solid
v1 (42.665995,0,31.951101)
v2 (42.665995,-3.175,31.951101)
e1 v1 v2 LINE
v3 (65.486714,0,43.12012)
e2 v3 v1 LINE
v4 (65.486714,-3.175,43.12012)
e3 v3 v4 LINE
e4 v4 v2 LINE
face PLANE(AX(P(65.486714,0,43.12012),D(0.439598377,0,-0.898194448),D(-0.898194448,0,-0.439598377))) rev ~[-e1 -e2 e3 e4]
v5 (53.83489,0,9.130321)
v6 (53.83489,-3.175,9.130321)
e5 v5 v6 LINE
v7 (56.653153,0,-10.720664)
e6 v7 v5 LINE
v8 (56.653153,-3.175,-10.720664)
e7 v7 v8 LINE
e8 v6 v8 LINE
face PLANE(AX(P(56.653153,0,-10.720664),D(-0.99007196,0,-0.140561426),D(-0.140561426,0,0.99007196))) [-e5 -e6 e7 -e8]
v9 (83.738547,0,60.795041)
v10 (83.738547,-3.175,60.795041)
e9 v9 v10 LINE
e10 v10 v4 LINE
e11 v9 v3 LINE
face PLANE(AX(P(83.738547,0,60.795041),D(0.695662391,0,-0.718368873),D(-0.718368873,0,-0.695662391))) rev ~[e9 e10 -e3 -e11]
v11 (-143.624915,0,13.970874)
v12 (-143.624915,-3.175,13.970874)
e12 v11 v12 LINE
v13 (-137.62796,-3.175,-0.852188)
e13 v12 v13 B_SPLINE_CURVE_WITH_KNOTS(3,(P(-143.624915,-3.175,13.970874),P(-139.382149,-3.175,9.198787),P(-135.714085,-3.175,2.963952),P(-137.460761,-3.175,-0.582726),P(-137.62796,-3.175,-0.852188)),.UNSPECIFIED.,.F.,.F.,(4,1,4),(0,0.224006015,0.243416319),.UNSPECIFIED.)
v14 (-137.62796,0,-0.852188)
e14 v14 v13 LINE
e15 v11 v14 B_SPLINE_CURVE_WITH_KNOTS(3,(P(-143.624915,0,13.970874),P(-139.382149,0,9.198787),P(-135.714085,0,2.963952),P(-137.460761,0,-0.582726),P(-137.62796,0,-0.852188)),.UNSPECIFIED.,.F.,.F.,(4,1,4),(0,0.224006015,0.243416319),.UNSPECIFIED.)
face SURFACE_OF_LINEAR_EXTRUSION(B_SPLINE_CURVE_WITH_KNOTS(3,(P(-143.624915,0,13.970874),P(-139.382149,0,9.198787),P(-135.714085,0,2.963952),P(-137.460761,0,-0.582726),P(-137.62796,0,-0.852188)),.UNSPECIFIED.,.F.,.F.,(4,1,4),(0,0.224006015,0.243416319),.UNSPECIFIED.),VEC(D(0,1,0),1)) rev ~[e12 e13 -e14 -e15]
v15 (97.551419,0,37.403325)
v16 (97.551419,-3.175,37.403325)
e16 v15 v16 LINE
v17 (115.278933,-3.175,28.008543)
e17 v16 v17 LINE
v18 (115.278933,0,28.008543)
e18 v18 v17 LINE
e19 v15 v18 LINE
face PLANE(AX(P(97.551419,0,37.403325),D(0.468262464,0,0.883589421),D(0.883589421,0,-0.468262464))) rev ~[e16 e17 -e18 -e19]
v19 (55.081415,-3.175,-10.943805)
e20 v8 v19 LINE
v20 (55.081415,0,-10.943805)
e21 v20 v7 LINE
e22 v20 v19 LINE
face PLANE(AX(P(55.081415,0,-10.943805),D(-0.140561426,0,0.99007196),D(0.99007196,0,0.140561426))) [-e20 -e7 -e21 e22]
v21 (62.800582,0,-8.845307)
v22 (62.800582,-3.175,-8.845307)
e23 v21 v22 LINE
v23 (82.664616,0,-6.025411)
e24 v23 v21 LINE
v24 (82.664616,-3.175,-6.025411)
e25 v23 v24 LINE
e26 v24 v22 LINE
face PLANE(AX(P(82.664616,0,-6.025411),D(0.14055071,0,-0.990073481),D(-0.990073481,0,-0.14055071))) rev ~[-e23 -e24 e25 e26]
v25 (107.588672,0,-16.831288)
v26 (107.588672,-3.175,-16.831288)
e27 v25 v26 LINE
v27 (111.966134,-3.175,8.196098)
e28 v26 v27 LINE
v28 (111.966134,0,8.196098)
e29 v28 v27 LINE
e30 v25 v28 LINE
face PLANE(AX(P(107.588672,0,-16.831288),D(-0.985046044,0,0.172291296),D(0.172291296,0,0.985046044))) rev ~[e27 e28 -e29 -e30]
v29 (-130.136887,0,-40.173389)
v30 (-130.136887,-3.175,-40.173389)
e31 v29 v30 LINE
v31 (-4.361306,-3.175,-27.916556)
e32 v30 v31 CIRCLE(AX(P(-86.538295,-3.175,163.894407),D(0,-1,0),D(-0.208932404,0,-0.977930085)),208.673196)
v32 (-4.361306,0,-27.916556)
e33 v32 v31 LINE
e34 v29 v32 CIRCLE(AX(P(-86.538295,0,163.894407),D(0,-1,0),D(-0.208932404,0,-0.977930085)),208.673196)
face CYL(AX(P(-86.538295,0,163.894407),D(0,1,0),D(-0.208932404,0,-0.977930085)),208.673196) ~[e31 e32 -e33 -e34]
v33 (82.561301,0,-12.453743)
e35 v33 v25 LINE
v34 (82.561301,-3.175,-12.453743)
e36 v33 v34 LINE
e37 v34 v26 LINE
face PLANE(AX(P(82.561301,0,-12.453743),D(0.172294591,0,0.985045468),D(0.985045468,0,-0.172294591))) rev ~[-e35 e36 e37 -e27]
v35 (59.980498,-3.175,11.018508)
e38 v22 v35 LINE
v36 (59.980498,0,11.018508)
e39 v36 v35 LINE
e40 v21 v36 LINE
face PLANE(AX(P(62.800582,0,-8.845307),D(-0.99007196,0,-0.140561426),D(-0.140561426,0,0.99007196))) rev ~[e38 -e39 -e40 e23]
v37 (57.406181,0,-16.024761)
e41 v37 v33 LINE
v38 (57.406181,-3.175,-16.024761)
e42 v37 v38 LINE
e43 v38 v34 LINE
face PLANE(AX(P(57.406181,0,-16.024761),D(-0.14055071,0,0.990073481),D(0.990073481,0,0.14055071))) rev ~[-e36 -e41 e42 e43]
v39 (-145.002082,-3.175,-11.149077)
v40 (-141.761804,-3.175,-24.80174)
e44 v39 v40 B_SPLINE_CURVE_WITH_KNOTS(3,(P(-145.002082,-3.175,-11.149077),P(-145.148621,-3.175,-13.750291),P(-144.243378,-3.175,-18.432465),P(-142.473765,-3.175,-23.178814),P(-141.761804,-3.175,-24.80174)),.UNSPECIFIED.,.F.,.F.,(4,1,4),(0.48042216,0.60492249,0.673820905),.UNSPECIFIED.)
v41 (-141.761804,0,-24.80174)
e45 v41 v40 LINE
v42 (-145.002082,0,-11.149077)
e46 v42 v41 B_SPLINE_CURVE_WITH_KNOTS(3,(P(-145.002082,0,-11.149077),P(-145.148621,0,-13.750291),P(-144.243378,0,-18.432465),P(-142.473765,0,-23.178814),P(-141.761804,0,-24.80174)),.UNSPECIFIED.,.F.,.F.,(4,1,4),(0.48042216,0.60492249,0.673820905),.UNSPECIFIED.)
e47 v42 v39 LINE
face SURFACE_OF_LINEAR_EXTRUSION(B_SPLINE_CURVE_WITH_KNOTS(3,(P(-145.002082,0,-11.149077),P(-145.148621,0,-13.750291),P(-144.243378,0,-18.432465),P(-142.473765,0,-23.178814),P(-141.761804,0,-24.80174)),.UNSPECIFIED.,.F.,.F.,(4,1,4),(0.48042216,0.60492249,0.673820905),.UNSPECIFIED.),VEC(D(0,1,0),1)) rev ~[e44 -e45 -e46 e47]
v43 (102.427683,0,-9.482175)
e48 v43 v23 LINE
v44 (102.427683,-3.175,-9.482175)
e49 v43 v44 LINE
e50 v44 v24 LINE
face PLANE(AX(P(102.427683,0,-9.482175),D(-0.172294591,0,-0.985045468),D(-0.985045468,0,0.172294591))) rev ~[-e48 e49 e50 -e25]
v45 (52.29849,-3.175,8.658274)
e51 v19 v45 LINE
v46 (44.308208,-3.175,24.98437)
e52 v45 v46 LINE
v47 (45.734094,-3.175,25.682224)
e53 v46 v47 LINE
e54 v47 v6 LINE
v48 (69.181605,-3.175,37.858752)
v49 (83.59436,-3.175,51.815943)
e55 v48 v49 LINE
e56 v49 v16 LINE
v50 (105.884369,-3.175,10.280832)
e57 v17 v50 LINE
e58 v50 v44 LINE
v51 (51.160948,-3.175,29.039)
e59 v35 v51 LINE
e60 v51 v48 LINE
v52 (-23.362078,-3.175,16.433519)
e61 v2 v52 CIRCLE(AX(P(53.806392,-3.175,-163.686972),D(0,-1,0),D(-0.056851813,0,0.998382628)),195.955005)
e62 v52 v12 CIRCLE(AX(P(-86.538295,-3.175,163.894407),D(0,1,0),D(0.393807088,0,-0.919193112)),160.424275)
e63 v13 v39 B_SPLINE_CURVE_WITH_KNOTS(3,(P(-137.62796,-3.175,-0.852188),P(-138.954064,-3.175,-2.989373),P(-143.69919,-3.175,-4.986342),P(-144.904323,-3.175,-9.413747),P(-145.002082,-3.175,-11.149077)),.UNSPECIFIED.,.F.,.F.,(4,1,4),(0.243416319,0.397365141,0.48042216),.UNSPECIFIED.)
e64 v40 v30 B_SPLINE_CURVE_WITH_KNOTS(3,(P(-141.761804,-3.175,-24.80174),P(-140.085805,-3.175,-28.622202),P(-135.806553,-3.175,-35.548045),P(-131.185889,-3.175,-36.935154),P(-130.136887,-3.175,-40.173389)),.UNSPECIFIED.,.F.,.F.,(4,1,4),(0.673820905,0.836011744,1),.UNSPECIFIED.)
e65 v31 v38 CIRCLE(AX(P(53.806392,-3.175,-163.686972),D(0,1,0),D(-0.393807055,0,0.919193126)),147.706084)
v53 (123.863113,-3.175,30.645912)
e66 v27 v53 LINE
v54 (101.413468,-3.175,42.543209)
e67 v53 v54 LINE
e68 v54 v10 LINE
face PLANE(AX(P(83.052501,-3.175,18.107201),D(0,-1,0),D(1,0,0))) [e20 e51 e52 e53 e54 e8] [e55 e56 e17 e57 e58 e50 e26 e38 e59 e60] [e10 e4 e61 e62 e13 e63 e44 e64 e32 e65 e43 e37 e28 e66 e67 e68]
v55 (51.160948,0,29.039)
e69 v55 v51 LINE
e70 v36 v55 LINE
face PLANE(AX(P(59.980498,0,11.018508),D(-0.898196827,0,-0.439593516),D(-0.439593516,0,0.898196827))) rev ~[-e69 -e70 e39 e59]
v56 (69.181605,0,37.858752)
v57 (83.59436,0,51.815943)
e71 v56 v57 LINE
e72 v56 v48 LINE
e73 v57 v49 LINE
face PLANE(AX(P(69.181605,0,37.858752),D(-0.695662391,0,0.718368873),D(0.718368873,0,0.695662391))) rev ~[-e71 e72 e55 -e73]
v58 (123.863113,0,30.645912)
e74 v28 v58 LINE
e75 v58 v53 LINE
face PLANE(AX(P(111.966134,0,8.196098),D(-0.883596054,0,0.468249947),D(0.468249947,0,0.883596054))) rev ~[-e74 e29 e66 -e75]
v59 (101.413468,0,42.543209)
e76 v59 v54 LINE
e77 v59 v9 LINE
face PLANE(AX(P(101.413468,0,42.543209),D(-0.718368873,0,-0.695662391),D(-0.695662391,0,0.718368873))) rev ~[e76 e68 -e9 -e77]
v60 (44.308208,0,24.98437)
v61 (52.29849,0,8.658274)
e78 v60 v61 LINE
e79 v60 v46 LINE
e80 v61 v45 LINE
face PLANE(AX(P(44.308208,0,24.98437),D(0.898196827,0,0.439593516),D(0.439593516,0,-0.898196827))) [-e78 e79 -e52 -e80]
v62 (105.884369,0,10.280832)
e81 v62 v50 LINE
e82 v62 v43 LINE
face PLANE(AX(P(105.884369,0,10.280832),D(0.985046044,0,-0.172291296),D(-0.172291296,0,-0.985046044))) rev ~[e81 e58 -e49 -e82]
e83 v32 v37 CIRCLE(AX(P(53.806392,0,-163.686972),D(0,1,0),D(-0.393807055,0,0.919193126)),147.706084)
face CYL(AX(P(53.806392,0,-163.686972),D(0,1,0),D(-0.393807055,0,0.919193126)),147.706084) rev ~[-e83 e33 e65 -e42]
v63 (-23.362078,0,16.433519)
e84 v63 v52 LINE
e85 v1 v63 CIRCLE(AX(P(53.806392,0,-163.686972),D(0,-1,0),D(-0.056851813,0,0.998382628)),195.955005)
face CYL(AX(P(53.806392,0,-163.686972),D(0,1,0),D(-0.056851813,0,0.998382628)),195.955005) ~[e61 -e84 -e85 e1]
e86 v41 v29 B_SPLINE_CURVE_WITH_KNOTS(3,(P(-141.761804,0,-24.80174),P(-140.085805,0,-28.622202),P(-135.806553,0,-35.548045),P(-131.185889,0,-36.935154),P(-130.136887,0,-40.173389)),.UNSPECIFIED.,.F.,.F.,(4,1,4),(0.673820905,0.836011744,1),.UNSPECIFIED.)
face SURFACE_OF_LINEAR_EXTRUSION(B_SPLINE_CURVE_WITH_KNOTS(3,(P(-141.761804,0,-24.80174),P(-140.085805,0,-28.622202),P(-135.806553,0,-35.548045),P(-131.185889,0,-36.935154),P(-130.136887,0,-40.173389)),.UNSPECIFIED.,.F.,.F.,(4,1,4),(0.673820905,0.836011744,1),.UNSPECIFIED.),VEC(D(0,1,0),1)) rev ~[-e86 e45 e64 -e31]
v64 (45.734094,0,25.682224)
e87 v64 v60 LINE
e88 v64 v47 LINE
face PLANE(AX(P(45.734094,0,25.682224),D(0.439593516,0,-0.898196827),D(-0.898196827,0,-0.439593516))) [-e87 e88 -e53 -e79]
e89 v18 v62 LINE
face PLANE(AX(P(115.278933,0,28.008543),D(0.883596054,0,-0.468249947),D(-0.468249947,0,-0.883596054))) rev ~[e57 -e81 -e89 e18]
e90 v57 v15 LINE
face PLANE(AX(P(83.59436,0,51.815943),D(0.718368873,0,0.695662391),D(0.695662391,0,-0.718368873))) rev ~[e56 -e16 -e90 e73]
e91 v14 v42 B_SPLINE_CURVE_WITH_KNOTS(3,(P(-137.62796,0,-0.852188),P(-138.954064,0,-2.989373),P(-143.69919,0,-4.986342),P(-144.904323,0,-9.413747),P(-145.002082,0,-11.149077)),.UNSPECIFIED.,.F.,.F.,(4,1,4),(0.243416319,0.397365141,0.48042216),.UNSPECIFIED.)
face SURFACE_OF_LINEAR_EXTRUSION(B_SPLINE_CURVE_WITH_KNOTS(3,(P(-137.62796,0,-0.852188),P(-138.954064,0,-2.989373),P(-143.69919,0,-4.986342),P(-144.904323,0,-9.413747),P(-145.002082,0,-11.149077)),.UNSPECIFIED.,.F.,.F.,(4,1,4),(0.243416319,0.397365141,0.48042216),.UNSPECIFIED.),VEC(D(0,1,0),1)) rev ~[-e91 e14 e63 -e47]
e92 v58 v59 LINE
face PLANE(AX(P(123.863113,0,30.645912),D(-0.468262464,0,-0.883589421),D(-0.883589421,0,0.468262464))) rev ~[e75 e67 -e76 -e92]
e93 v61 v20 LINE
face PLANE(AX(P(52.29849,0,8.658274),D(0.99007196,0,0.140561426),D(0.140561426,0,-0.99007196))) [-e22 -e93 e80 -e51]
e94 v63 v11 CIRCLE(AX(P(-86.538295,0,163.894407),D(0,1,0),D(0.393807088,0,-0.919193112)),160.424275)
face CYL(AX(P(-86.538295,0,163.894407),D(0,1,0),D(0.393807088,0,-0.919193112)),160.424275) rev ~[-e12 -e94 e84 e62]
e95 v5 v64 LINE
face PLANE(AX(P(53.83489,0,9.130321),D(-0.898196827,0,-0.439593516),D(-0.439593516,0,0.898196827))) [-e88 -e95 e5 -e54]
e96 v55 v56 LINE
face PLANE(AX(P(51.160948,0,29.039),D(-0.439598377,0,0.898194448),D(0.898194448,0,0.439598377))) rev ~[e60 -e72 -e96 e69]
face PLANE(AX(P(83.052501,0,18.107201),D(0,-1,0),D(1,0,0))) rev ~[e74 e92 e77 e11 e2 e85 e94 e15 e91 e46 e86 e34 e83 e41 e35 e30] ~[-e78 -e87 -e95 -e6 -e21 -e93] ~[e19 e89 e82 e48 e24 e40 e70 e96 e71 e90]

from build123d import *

# Parameters (mm, degrees)
F1_DEPTH = 3.175
F3_DEPTH = 25.4


# Not quite as in the source:
# - a feature of the source that left no trace in its solid (it failed there, or was rolled back) is left out


with BuildPart() as f1:
    # F0 (on Front) → F1 (new body)
    with BuildSketch(Plane.XZ):
        Polygon((83.7385465681, 60.7950414864), (65.4867140893, 43.1201200129), (42.6659945136, 31.9511005402), (48.4525043638, 20.1278488249), (53.8348904797, 9.1303205178), (53.9749918148, 8.1434892953), (55.6890408221, -3.9297509459), (57.4061805077, -16.0247609861), (82.5613006616, -12.4537432078), (107.5886724448, -16.8312881314), (111.9661336404, 8.1960982966), (123.863112913, 30.645911706), (101.4134680417, 42.5432090075), align=None)
        Polygon((62.8005820601, -8.8453070311), (59.98049806, 11.018507533), (51.1609480861, 29.0390003787), (69.1816050409, 37.8587515602), (83.5943604063, 51.8159429598), (97.5514190703, 37.4033246624), (115.278932926, 28.0085434102), (105.884368679, 10.2808320666), (102.427683451, -9.4821750964), (82.6646160624, -6.0254111952), align=None, mode=Mode.SUBTRACT)
        with BuildLine():
            Line((48.4525043638, 20.1278488249), (42.6659945136, 31.9511005402))
            ThreePointArc((42.6659945136, 31.9511005402), (8.9754555579, 27.0708614751), (-23.3620781244, 16.433518583))
            ThreePointArc((-23.3620781244, 16.433518583), (-83.2539454778, 3.5037557836), (-143.6249151078, 13.9708741582))
            add(Edge.make_bspline(
                [(-143.6249151078, 13.9708741582), (-139.3821490751, 9.1987873198), (-135.7140854359, 2.9639524936), (-137.4607610868, -0.5827256571), (-137.6279600012, -0.8521879559)],
                knots=[0, 0, 0, 0, 0.2240060147, 0.243416319, 0.243416319, 0.243416319, 0.243416319], degree=3))
            ThreePointArc((-137.6279600012, -0.8521879559), (-77.5676001001, -8.3586658465), (-18.6118863058, 5.3459995187))
            ThreePointArc((-18.6118863058, 5.3459995187), (14.224158407, 15.8953190594), (48.4525043638, 20.1278488249))
        make_face()
        with BuildLine():
            Line((53.8348904797, 9.1303205178), (48.4525043638, 20.1278488249))
            ThreePointArc((48.4525043638, 20.1278488249), (14.224158407, 15.8953190594), (-18.6118863058, 5.3459995187))
            ThreePointArc((-18.6118863058, 5.3459995187), (-77.5676001001, -8.3586658465), (-137.6279600012, -0.8521879559))
            add(Edge.make_bspline(
                [(-137.6279600012, -0.8521879559), (-138.9540636818, -2.9893725644), (-143.6991899879, -4.9863421871), (-144.9043234797, -9.4137473987), (-145.0020824108, -11.1490770117)],
                knots=[0.243416319, 0.243416319, 0.243416319, 0.243416319, 0.3973651411, 0.4804221604, 0.4804221604, 0.4804221604, 0.4804221604], degree=3))
            ThreePointArc((-145.0020824108, -11.1490770117), (-78.9349092151, -20.4976327315), (-13.8616894677, -5.7415173951))
            ThreePointArc((-13.8616894677, -5.7415173951), (19.3499940642, 4.6534346359), (53.9749918148, 8.1434892953))
            Line((53.9749918148, 8.1434892953), (53.8348904797, 9.1303205178))
        make_face()
        with BuildLine():
            Line((55.6890408221, -3.9297509459), (53.9749918148, 8.1434892953))
            ThreePointArc((53.9749918148, 8.1434892953), (19.3499940642, 4.6534346359), (-13.8616894677, -5.7415173951))
            ThreePointArc((-13.8616894677, -5.7415173951), (-78.9349092151, -20.4976327315), (-145.0020824108, -11.1490770117))
            add(Edge.make_bspline(
                [(-145.0020824108, -11.1490770117), (-145.148620527, -13.7502913411), (-144.2433778815, -18.4324653045), (-142.4737649258, -23.1788138286), (-141.761803512, -24.8017401992)],
                knots=[0.4804221604, 0.4804221604, 0.4804221604, 0.4804221604, 0.6049224901, 0.6738209053, 0.6738209053, 0.6738209053, 0.6738209053], degree=3))
            ThreePointArc((-141.761803512, -24.8017401992), (-74.7426386358, -32.3624002943), (-9.11149777, -16.8290365111))
            ThreePointArc((-9.11149777, -16.8290365111), (22.6146775302, -6.9930314551), (55.6890408221, -3.9297509459))
        make_face()
        with BuildLine():
            Line((57.4061805077, -16.0247609861), (55.6890408221, -3.9297509459))
            ThreePointArc((55.6890408221, -3.9297509459), (22.6146775302, -6.9930314551), (-9.11149777, -16.8290365111))
            ThreePointArc((-9.11149777, -16.8290365111), (-74.7426386358, -32.3624002943), (-141.761803512, -24.8017401992))
            add(Edge.make_bspline(
                [(-141.761803512, -24.8017401992), (-140.0858053256, -28.6222023777), (-135.8065528754, -35.5480454062), (-131.1858892441, -36.9351543486), (-130.136887087, -40.1733894927)],
                knots=[0.6738209053, 0.6738209053, 0.6738209053, 0.6738209053, 0.8360117443, 1, 1, 1, 1], degree=3))
            ThreePointArc((-130.136887087, -40.1733894927), (-66.2989601616, -43.7949576201), (-4.3613058839, -27.9165555465))
            ThreePointArc((-4.3613058839, -27.9165555465), (25.8820678715, -18.6444983253), (57.4061805077, -16.0247609861))
        make_face()
    extrude(amount=F1_DEPTH)

    # F2 (on Front) → F3 (cut)
    with BuildSketch(Plane.XZ):
        Polygon((56.6531529851, -10.7206639914), (53.8348904797, 9.1303205178), (45.7340942467, 25.6822240721), (44.3082079533, 24.9843699385), (52.2984898455, 8.6582741514), (55.0814150388, -10.9438050714), align=None)
    extrude(amount=F3_DEPTH, mode=Mode.SUBTRACT)


solid = f1.part
